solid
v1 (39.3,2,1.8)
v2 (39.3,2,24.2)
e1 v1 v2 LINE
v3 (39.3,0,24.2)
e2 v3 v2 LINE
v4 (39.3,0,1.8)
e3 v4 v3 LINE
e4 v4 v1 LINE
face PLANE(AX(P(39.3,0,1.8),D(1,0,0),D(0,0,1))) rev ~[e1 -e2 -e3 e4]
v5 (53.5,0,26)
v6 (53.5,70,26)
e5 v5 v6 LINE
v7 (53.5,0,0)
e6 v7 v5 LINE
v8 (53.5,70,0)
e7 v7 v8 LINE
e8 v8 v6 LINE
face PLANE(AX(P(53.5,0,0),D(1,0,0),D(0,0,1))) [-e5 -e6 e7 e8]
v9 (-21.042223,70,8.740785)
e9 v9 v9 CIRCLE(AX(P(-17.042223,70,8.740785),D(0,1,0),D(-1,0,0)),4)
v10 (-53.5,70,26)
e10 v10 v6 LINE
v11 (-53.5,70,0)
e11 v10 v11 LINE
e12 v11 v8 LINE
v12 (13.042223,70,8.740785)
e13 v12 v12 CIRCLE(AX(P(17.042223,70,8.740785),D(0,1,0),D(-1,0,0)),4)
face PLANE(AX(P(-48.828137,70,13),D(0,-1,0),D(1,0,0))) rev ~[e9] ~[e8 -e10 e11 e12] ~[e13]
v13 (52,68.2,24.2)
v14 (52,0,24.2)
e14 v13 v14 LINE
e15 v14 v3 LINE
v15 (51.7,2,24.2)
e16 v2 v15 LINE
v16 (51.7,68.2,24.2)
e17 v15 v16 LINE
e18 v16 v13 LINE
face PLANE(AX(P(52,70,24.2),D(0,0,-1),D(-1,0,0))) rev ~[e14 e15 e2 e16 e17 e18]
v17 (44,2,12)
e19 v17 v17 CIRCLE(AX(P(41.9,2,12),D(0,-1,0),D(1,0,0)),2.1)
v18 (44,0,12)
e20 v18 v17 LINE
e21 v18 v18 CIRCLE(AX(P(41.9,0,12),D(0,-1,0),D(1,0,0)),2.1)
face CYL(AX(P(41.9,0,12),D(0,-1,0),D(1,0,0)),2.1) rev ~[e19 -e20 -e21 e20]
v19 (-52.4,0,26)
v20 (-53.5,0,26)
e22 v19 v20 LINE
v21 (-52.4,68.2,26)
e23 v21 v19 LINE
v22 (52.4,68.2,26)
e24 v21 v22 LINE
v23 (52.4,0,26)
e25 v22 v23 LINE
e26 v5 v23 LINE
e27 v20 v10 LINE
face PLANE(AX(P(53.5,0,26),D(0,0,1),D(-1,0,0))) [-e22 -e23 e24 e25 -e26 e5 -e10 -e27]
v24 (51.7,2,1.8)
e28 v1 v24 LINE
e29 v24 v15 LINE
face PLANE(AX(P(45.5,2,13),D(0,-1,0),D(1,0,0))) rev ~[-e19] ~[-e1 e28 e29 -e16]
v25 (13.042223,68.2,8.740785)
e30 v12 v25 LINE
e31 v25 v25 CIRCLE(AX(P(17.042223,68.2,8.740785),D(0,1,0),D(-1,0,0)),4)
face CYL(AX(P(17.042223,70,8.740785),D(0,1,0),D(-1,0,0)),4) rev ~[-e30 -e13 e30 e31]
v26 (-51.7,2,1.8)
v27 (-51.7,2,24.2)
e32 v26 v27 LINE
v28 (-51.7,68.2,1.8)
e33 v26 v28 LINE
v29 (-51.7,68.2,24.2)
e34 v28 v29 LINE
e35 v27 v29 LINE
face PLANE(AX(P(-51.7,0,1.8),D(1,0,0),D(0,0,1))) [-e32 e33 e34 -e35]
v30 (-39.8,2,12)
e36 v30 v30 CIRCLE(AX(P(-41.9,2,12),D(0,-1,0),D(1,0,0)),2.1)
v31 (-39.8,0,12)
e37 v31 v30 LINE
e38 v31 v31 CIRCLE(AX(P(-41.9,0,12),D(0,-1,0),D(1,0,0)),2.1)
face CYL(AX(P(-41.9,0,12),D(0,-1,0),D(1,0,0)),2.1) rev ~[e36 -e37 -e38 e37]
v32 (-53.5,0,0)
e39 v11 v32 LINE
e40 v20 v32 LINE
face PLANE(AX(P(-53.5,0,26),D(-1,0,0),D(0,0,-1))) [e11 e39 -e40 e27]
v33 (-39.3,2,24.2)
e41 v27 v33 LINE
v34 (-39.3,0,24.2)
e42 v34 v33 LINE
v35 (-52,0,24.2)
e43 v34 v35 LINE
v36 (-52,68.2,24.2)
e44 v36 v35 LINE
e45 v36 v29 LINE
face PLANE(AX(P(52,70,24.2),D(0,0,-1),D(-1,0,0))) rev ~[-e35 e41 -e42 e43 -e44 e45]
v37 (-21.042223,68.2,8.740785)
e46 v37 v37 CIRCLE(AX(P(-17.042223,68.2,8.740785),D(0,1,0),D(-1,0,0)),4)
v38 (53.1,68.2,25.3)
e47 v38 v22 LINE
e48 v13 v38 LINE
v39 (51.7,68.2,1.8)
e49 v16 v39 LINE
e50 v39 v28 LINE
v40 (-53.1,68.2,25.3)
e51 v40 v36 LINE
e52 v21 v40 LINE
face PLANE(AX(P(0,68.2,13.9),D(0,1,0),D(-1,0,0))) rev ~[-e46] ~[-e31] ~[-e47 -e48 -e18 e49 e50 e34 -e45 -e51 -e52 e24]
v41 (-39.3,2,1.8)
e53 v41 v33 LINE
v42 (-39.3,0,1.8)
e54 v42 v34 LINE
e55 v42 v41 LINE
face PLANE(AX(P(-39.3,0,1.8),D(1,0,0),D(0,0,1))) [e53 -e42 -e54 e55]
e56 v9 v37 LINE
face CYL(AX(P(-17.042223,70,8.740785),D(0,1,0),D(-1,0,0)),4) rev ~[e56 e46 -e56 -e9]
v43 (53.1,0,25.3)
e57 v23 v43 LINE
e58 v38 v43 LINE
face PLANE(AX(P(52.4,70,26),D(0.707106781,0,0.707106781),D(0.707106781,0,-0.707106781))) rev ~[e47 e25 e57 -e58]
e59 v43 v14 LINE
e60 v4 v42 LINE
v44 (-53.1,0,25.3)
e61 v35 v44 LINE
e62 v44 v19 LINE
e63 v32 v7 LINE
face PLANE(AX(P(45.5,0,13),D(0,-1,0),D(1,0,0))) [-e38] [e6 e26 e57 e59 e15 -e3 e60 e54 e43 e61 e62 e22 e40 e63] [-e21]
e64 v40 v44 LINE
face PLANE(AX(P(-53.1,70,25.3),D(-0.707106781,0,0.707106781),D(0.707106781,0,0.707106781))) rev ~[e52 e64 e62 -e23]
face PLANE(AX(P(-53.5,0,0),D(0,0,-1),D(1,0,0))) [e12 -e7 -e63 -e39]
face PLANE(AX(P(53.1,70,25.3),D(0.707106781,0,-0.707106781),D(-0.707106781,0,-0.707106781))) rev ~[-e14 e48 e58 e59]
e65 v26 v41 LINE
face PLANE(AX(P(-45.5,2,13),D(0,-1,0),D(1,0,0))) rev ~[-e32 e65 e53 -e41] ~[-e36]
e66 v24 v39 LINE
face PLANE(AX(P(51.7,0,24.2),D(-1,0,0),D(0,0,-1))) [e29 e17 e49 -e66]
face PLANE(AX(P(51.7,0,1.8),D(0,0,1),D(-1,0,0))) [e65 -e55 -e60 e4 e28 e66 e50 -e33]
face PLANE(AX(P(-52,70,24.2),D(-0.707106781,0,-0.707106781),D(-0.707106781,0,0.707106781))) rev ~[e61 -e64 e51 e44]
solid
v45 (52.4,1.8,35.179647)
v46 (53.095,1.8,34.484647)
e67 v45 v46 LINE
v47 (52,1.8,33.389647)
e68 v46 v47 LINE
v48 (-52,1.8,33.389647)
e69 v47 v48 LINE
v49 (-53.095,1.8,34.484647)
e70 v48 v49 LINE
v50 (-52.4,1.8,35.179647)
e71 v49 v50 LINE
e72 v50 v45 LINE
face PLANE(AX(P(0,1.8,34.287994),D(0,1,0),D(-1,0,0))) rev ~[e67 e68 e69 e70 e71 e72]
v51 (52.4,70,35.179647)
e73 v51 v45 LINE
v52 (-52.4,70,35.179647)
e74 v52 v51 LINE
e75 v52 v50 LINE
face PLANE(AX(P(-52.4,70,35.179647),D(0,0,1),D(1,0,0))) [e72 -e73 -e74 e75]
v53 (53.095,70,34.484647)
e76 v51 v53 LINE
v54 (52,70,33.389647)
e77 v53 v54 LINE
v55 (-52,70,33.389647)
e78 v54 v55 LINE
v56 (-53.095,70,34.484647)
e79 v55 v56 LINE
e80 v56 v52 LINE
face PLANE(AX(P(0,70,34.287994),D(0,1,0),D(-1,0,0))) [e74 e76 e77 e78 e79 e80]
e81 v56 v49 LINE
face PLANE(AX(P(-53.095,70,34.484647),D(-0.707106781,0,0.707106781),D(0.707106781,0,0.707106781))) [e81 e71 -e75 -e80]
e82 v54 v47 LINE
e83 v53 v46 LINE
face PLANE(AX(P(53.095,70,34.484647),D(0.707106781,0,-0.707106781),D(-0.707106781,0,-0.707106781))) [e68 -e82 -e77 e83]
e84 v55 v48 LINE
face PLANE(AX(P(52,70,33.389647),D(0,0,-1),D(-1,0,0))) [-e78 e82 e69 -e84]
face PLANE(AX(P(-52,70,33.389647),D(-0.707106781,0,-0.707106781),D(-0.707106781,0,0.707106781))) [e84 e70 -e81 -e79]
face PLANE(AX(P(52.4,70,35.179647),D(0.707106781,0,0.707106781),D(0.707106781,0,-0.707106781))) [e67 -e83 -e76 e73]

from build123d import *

# Parameters (mm, degrees)
F1_DEPTH = 70
F0_W     = 12.4
F0_H     = 22.4
F0_R     = 2.1
F2_DEPTH = 2
F5_DEPTH = 70
F6_DEPTH = 68.2
F7_R     = 4
F8_DEPTH = 1.8


with BuildPart() as f1:
    # F0 (on Front) → F1 (new body)
    with BuildSketch(Plane.XZ):
        Polygon((-53.5, 0), (-39.3, 0), (-39.3, 1.8), (-51.7, 1.8), (-51.7, 24.2), (-39.3, 24.2), (-39.3, 26), (-53.5, 26), align=None)
        Polygon((0, 24.2), (39.3, 24.2), (39.3, 26), (0, 26), (-39.3, 26), (-39.3, 24.2), align=None)
        Polygon((-39.3, 0), (0, 0), (39.3, 0), (39.3, 1.8), (0, 1.8), (-39.3, 1.8), align=None)
        Polygon((39.3, 1.8), (39.3, 0), (53.5, 0), (53.5, 26), (39.3, 26), (39.3, 24.2), (51.7, 24.2), (51.7, 1.8), align=None)
    extrude(amount=-F1_DEPTH)

    # F0 (on Front) → F2 (join)
    with BuildSketch(Plane.XZ):
        with Locations((45.5, 13)):
            Rectangle(F0_W, F0_H)
        with Locations((41.9, 12)):
            Circle(F0_R, mode=Mode.SUBTRACT)
        with Locations((-45.5, 13)):
            Rectangle(F0_W, F0_H)
        with Locations((-41.9, 12)):
            Circle(F0_R, mode=Mode.SUBTRACT)
    extrude(amount=-F2_DEPTH)

    # F4 (on offset) → F5 (cut)
    with BuildSketch(Plane(origin=(0, 70, 0), x_dir=(-1, 0, 0), z_dir=(0, 1, 0))):
        Polygon((52.4, 26), (0, 26), (-52.4, 26), (-53.1, 25.3), (-52, 24.2), (0, 24.2), (52, 24.2), (53.1, 25.3), align=None)
    extrude(amount=-F5_DEPTH, mode=Mode.SUBTRACT)

    # F7 (on face) → F8 (join)
    with BuildSketch(Plane(origin=(0, 70, 0), x_dir=(-1, 0, 0), z_dir=(0, 1, 0))):
        Polygon((-51.7, 1.8), (0, 1.8), (51.7, 1.8), (51.7, 23.8758921623), (51.7, 24.2), (51.7, 26), (0, 26), (-51.7, 26), (-51.7, 24.2), (-51.7, 23.8758921623), align=None)
        with Locations((-17.0422233641, 8.7407846004)):
            Circle(F7_R, mode=Mode.SUBTRACT)
        with Locations((17.0422233641, 8.7407846004)):
            Circle(F7_R, mode=Mode.SUBTRACT)
        Polygon((51.7, 1.8), (0, 1.8), (-51.7, 1.8), (-51.7, 23.8758921623), (-53.5, 23.8758921623), (-53.5, 0), (53.5, 0), (53.5, 23.8758921623), (51.7, 23.8758921623), align=None)
        Polygon((51.7, 24.2), (51.7, 23.8758921623), (53.5, 23.8758921623), (53.5, 26), (52.4, 26), (53.1, 25.3), (52, 24.2), align=None)
        Polygon((-53.5, 23.8758921623), (-51.7, 23.8758921623), (-51.7, 24.2), (-52, 24.2), (-53.1, 25.3), (-52.4, 26), (-53.5, 26), align=None)
        Polygon((51.7, 26), (51.7, 24.2), (52, 24.2), (53.1, 25.3), (52.4, 26), align=None)
        Polygon((-52, 24.2), (-51.7, 24.2), (-51.7, 26), (-52.4, 26), (-53.1, 25.3), align=None)
    extrude(amount=-F8_DEPTH)


with BuildPart() as f6:
    # F4 (on offset) → F6 (new body)
    with BuildSketch(Plane(origin=(0, 70, 0), x_dir=(-1, 0, 0), z_dir=(0, 1, 0))):
        Polygon((-52, 33.38964656), (0, 33.38964656), (52, 33.38964656), (53.095, 34.48464656), (52.4, 35.17964656), (0, 35.17964656), (-52.4, 35.17964656), (-53.095, 34.48464656), align=None)
    extrude(amount=-F6_DEPTH)


solid = Compound([f1.part, f6.part])
